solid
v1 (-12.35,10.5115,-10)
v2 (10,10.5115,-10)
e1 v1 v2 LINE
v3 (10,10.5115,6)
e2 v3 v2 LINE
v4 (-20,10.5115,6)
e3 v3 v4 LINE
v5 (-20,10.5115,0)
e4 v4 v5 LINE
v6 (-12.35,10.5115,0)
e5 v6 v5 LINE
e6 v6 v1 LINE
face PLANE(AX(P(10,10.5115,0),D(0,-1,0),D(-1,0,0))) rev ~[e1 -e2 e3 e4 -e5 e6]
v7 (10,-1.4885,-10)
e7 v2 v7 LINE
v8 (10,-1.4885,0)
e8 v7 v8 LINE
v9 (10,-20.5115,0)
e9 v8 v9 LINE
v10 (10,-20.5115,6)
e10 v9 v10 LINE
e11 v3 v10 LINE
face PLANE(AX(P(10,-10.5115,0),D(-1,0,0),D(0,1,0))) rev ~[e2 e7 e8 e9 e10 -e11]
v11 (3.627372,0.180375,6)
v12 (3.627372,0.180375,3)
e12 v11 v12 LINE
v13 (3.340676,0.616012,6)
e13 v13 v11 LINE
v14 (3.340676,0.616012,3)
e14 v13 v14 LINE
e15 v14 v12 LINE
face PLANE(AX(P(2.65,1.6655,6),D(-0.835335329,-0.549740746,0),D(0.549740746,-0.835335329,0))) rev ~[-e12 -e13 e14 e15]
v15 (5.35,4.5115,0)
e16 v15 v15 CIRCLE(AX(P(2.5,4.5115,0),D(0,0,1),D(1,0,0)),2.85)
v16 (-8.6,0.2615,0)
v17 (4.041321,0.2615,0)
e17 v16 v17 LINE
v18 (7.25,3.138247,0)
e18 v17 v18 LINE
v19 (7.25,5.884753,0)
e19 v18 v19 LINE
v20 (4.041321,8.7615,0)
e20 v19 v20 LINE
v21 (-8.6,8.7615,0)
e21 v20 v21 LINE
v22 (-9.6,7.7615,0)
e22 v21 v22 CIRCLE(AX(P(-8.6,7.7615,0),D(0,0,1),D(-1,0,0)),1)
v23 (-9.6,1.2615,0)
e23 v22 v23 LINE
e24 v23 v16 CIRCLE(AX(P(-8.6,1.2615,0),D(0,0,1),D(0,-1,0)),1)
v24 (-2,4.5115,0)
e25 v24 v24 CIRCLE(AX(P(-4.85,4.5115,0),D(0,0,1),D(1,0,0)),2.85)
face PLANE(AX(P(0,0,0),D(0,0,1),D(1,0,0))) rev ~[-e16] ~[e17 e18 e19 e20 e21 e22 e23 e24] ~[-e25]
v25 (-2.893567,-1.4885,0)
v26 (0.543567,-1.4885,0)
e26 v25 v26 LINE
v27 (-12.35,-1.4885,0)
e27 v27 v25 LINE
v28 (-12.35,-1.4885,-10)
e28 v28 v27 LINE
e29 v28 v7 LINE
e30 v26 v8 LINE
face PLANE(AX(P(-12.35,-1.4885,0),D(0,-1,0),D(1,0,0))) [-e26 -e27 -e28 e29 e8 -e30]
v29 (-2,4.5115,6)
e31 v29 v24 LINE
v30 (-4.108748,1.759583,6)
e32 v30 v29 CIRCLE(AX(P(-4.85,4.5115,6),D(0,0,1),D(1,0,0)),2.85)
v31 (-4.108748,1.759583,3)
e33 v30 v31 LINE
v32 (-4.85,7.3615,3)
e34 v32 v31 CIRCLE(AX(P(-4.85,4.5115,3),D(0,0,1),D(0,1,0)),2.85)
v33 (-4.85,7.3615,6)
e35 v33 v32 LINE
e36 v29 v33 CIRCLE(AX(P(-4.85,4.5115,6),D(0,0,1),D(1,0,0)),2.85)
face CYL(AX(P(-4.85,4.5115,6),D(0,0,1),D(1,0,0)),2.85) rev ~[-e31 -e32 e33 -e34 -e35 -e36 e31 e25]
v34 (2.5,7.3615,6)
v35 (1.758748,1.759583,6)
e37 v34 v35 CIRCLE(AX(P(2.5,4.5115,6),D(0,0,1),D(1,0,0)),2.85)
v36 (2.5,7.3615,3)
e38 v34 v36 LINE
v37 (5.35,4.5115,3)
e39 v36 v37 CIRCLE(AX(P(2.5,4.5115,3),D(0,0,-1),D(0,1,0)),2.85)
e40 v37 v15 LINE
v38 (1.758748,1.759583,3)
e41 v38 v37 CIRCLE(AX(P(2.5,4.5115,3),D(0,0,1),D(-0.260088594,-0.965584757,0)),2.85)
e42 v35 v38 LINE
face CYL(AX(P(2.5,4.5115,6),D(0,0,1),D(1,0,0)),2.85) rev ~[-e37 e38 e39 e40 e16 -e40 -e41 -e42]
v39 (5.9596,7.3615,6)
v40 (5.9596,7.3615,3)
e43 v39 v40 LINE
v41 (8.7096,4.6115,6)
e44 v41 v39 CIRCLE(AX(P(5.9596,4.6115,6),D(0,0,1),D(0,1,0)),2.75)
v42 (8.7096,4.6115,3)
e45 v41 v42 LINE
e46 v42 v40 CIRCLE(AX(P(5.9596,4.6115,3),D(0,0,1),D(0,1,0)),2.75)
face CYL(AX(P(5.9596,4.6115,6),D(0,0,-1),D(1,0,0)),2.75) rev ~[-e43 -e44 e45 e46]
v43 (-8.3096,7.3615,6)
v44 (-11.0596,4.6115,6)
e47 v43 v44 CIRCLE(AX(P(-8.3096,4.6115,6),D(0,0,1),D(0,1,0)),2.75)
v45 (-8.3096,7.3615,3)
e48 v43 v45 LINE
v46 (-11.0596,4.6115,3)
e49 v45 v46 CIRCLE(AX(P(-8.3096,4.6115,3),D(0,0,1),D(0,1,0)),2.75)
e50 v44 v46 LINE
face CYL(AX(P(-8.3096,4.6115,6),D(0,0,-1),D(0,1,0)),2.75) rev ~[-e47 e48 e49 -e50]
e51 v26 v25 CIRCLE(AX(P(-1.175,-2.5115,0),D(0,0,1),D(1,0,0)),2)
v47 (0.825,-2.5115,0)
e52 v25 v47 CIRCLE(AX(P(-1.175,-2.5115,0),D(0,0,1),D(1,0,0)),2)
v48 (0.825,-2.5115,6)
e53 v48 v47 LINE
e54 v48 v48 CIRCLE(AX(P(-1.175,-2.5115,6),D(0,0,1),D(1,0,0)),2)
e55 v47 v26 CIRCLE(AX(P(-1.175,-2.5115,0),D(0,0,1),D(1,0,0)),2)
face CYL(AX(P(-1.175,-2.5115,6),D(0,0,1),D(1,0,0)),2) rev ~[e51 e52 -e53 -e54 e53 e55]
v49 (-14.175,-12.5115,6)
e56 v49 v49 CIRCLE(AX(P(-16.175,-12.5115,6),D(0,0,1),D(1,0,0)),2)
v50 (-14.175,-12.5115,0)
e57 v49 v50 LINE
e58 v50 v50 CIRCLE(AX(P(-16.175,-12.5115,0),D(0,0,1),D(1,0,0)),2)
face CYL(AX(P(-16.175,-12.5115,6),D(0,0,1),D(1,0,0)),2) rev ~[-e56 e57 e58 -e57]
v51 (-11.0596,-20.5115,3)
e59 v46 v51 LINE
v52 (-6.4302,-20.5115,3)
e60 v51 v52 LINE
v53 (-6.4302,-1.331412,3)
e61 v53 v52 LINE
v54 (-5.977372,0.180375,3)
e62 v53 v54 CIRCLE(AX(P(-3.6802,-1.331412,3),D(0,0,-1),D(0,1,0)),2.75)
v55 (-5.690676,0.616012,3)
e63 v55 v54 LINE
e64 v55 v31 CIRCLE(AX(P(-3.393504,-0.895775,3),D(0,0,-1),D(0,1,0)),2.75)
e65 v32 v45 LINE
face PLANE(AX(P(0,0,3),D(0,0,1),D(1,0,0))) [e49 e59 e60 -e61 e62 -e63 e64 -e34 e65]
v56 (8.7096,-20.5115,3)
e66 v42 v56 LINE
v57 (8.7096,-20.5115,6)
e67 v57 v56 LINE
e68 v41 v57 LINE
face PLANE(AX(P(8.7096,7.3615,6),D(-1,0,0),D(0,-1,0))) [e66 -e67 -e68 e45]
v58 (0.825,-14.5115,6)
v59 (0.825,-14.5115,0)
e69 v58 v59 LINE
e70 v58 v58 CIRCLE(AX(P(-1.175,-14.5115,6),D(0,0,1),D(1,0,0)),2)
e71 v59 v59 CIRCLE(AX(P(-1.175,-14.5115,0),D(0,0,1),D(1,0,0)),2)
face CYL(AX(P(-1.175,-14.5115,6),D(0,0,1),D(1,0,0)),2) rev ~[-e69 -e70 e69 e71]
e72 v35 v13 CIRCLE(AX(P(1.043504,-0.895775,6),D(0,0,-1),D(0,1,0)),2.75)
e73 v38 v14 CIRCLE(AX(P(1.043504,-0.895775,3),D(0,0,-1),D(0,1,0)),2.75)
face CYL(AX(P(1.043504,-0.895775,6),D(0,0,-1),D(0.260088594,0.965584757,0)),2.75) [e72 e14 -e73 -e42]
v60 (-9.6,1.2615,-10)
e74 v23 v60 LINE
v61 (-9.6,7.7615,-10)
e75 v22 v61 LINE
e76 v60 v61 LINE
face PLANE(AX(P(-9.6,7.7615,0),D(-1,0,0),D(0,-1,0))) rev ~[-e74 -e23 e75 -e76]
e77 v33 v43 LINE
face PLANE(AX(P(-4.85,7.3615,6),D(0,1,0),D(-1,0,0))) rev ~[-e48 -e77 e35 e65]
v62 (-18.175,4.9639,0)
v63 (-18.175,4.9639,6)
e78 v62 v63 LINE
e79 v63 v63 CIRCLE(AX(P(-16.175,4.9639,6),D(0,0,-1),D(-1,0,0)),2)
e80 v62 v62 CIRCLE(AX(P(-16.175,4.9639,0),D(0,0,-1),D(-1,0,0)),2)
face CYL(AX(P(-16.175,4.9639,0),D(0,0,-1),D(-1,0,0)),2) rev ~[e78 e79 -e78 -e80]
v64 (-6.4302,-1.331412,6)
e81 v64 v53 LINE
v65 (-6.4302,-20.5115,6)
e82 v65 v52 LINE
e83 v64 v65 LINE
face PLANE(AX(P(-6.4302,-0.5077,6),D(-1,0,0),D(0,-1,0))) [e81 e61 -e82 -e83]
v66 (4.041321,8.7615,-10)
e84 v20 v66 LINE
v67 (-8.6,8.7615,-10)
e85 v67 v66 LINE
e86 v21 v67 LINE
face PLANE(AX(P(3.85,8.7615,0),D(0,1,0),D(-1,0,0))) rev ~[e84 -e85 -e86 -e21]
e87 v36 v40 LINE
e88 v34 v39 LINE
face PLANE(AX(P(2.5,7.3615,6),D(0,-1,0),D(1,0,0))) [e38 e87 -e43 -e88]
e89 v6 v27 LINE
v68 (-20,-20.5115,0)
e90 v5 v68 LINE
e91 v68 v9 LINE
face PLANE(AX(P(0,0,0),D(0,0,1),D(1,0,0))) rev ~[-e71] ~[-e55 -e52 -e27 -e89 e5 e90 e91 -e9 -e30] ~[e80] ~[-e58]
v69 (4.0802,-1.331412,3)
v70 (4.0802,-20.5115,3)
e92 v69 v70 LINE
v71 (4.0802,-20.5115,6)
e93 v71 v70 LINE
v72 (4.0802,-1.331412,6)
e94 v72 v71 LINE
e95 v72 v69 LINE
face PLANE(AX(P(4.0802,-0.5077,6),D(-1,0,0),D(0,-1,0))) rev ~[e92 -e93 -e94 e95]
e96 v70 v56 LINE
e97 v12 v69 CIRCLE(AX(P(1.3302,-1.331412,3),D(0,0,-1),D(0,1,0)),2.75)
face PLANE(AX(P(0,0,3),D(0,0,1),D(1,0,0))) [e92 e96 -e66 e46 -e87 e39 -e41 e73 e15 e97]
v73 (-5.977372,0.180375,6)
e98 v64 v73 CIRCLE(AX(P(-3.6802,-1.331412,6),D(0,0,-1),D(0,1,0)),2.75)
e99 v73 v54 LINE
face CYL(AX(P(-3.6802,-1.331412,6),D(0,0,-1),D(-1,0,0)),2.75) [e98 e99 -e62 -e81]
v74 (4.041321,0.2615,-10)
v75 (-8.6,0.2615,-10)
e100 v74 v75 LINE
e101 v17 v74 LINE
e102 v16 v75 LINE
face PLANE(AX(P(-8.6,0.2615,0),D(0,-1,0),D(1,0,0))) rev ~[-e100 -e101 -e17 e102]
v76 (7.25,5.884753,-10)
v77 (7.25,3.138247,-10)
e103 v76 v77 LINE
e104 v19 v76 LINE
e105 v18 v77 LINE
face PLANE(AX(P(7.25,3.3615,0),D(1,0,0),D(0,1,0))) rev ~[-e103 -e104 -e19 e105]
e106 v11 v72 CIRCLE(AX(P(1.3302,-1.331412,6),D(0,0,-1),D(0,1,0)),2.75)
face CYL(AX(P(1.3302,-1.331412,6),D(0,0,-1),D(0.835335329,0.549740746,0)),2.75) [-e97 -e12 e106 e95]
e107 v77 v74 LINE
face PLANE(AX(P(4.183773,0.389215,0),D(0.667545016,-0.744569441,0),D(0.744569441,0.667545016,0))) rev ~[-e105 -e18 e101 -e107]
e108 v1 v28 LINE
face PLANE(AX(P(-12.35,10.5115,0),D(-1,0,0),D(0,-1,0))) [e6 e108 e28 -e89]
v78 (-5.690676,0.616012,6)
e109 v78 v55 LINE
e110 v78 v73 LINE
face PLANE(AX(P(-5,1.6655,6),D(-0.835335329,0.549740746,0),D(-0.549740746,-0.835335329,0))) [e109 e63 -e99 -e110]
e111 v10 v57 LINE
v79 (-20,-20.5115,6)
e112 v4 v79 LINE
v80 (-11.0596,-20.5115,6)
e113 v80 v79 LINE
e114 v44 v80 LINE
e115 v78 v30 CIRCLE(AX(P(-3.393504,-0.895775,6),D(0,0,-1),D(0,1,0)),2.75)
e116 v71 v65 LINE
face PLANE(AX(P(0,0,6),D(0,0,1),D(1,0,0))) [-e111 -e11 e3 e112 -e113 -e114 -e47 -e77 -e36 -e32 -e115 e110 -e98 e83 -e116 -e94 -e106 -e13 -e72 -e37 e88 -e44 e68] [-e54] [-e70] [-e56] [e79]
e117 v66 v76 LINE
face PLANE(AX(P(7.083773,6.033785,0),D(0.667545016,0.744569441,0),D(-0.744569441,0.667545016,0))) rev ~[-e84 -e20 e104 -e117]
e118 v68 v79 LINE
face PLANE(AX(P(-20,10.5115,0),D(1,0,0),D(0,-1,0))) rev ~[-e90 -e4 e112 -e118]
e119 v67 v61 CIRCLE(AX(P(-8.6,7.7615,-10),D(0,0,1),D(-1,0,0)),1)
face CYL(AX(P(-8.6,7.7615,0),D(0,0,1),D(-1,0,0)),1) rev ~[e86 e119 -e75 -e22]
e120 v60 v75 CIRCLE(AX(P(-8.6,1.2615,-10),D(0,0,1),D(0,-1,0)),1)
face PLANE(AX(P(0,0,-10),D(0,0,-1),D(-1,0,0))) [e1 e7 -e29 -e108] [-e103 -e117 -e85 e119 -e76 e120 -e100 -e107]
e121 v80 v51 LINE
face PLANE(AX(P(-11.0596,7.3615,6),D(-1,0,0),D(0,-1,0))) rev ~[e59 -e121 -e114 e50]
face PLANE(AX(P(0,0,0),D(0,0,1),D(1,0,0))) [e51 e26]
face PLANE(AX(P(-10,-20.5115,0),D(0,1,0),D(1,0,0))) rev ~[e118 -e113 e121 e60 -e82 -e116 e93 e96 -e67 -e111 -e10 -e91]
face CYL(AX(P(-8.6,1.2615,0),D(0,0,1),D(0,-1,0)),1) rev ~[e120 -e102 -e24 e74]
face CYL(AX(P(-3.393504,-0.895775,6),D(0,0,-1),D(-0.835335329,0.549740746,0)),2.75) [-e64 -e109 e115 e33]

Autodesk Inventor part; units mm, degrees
ref_plane "YZ Plane" through (0, 0, 0) normal (1, 0, 0) x (0, 1, 0)
ref_plane "XZ Plane" through (0, 0, 0) normal (0, 1, 0) x (-1, 0, 0)
ref_plane "XY Plane" through (0, 0, 0) normal (0, 0, 1) x (1, 0, 0)
sketch "Эскиз1" plane through (0, 0, 0) normal (0, 0, 1) x (1, 0, 0)
  line L0 (-10, -10.5115) -> (10, -10.5115)
  line L1 (10, -10.5115) -> (10, 10.5115)
  line L2 (10, 10.5115) -> (-10, 10.5115)
  line L3 (-10, 10.5115) -> (-10, -10.5115)
  line L4 (-10, -10.5115) -> (10, 10.5115) construction
  line L5 (10, -10.5115) -> (-10, 10.5115) construction
  point P0 (0, 0)
  dimension "d0" = 20
  dimension "d1" = 21.023
extrude "Выдавливание1" add sketch "Эскиз1" along normal blind 6
sketch "Эскиз2" plane through (0, 0, 6) normal (0, 0, 1) x (1, 0, 0)
  circle A0 centre (2.5, 4.5115) radius 2.85 projected
  circle A1 centre (-4.85, 4.5115) radius 2.85 projected
  point P0 (0, 0)
extrude "Выдавливание2" cut sketch "Эскиз2" against normal blind 6
move faces "Перенос1" translate (-10, 0, 0) faces at (-10, 3.5038, 2)
move faces "Перенос2" translate (0, -10, 0) faces at (-10, -10.5115, 2)
sketch "Эскиз4" plane through (0, 0, 0) normal (0, 0, -1) x (-1, 0, 0)
  line L0 (8.6, 0.7615) -> (-3.85, 0.7615) projected
  arc A0 (8.6, 0.7615) -> (9.1, 1.2615) centre (8.6, 1.2615) ccw projected
  line L1 (9.1, 7.7615) -> (9.1, 1.2615) projected
  line L2 (-3.85, 8.2615) -> (8.6, 8.2615) projected
  arc A1 (9.1, 7.7615) -> (8.6, 8.2615) centre (8.6, 7.7615) ccw projected
  line L3 (-6.75, 5.6615) -> (-3.85, 8.2615) projected
  line L4 (-6.75, 3.3615) -> (-6.75, 5.6615) projected
  line L5 (-3.85, 0.7615) -> (-6.75, 3.3615) projected
  line L6 (-10, 10.5115) -> (20, 10.5115) projected
  line L7 (-10, 10.5115) -> (12.35, 10.5115)
  line L8 (12.35, 10.5115) -> (12.35, -1.4885)
  line L9 (12.35, -1.4885) -> (-10, -1.4885)
  line L10 (-10, -1.4885) -> (-10, 10.5115)
  point P0 (0, 0)
  dimension "d19" = 2.25
  dimension "d20" = 2.25
  dimension "d21" = 3.25
  dimension "d23" = 3.25
extrude "Выдавливание4" add sketch "Эскиз4" along normal blind 10
offset faces "Размер1" outward -0.5 faces at (-0.3, 8.2615, -3.3333) (-8.9665, 8.1016, -6.6667) (-9.1, 5.5948, -3.3333) (5.7833, 6.5282, -3.3333) (6.75, 4.1282, -3.3333) (4.8167, 1.6282, -3.3333) (-4.45, 0.7615, -3.3333) (-8.7474, 0.7837, -6.6667)
sketch "Эскиз5" plane through (0, 0, 0) normal (0, 0, -1) x (-1, 0, 0)
  circle A0 centre (16.175, 4.9639) radius 2
  line L0 (12.35, 10.5115) -> (20, 10.5115) projected
  point P0 (0, 0)
  point P1 (16.175, 10.5115)
  dimension "d27" = 4
extrude "Выдавливание5" cut sketch "Эскиз5" against normal blind 10
sketch "Эскиз6" plane through (0, 0, 6) normal (0, 0, 1) x (1, 0, 0)
  circle A0 centre (-16.175, -12.5115) radius 2
  circle A1 centre (-16.175, 4.9639) radius 2 projected
  circle A2 centre (-1.1985, -0.3999) radius 2
  line L0 (-20, -20.5115) -> (10, -20.5115) projected
  point P0 (0, 0)
  dimension "d30" = 4
  dimension "d31" = 4
  dimension "d46" = 8
extrude "Выдавливание6" cut sketch "Эскиз6" against normal blind 6.5 contours A0
sketch "Эскиз7" plane through (0, 0, 6) normal (0, 0, 1) x (1, 0, 0)
  circle A0 centre (-4.85, 4.5115) radius 2.85 projected
  line L0 (-4.85, 7.3615) -> (-11.0596, 7.3615)
  line L1 (-11.0596, 7.3615) -> (-11.0596, -20.5115)
  line L2 (-20, -20.5115) -> (10, -20.5115) projected
  line L3 (-5, 1.6655) -> (-6.4302, -0.5077)
  line L4 (-6.4302, -0.5077) -> (-6.4302, -20.5115)
  line L5 (10, 10.5115) -> (-20, 10.5115) projected
  line L6 (-1.175, 10.5115) -> (-1.175, 2.4545) construction
  circle A1 centre (2.5, 4.5115) radius 2.85 projected
  line L7 (-4.85, 4.5115) -> (-4.85, 5.527) construction
  line L8 (2.5, 4.5115) -> (2.5, 5.527) construction
  line L9 (2.5, 7.3615) -> (8.7096, 7.3615)
  line L10 (8.7096, 7.3615) -> (8.7096, -20.5115)
  line L11 (2.65, 1.6655) -> (4.0802, -0.5077)
  line L12 (4.0802, -0.5077) -> (4.0802, -20.5115)
  point P0 (0, 0)
extrude "Выдавливание7" cut sketch "Эскиз7" against normal blind 3 contours A0 L3 L4 L2 L1 L0 | L12 L11 A1 L9 L10 L2
fillet "Сопряжение2" radius 2.75 6 edges at (8.7096, 7.3615, 4.5) (2.65, 1.6655, 4.5) (4.0802, -0.5077, 4.5) (-5, 1.6655, 4.5) (-6.4302, -0.5077, 4.5) (-11.0596, 7.3615, 4.5)
sketch "Эскиз8" plane through (0, 0, 6) normal (0, 0, 1) x (1, 0, 0)
  circle A0 centre (-1.175, -2.5115) radius 2
  circle A1 centre (-1.175, -14.5115) radius 2
  line L0 (-6.4302, -20.5115) -> (4.0802, -20.5115) projected
  circle A2 centre (-1.175, -2.5115) radius 3 construction
  point P0 (0, 0)
  point P1 (-1.175, -20.5115)
  dimension "d39" = 4
  dimension "d40" = 4
  dimension "d41" = 6
  dimension "d42" = 12
  dimension "d43" = 6
extrude "Выдавливание8" cut sketch "Эскиз8" against normal up to surface (6 mm away)
equation "\"d20\" = d19"
equation "\"d23\" = d21"
properties part number "000.012.001 - Основание"
